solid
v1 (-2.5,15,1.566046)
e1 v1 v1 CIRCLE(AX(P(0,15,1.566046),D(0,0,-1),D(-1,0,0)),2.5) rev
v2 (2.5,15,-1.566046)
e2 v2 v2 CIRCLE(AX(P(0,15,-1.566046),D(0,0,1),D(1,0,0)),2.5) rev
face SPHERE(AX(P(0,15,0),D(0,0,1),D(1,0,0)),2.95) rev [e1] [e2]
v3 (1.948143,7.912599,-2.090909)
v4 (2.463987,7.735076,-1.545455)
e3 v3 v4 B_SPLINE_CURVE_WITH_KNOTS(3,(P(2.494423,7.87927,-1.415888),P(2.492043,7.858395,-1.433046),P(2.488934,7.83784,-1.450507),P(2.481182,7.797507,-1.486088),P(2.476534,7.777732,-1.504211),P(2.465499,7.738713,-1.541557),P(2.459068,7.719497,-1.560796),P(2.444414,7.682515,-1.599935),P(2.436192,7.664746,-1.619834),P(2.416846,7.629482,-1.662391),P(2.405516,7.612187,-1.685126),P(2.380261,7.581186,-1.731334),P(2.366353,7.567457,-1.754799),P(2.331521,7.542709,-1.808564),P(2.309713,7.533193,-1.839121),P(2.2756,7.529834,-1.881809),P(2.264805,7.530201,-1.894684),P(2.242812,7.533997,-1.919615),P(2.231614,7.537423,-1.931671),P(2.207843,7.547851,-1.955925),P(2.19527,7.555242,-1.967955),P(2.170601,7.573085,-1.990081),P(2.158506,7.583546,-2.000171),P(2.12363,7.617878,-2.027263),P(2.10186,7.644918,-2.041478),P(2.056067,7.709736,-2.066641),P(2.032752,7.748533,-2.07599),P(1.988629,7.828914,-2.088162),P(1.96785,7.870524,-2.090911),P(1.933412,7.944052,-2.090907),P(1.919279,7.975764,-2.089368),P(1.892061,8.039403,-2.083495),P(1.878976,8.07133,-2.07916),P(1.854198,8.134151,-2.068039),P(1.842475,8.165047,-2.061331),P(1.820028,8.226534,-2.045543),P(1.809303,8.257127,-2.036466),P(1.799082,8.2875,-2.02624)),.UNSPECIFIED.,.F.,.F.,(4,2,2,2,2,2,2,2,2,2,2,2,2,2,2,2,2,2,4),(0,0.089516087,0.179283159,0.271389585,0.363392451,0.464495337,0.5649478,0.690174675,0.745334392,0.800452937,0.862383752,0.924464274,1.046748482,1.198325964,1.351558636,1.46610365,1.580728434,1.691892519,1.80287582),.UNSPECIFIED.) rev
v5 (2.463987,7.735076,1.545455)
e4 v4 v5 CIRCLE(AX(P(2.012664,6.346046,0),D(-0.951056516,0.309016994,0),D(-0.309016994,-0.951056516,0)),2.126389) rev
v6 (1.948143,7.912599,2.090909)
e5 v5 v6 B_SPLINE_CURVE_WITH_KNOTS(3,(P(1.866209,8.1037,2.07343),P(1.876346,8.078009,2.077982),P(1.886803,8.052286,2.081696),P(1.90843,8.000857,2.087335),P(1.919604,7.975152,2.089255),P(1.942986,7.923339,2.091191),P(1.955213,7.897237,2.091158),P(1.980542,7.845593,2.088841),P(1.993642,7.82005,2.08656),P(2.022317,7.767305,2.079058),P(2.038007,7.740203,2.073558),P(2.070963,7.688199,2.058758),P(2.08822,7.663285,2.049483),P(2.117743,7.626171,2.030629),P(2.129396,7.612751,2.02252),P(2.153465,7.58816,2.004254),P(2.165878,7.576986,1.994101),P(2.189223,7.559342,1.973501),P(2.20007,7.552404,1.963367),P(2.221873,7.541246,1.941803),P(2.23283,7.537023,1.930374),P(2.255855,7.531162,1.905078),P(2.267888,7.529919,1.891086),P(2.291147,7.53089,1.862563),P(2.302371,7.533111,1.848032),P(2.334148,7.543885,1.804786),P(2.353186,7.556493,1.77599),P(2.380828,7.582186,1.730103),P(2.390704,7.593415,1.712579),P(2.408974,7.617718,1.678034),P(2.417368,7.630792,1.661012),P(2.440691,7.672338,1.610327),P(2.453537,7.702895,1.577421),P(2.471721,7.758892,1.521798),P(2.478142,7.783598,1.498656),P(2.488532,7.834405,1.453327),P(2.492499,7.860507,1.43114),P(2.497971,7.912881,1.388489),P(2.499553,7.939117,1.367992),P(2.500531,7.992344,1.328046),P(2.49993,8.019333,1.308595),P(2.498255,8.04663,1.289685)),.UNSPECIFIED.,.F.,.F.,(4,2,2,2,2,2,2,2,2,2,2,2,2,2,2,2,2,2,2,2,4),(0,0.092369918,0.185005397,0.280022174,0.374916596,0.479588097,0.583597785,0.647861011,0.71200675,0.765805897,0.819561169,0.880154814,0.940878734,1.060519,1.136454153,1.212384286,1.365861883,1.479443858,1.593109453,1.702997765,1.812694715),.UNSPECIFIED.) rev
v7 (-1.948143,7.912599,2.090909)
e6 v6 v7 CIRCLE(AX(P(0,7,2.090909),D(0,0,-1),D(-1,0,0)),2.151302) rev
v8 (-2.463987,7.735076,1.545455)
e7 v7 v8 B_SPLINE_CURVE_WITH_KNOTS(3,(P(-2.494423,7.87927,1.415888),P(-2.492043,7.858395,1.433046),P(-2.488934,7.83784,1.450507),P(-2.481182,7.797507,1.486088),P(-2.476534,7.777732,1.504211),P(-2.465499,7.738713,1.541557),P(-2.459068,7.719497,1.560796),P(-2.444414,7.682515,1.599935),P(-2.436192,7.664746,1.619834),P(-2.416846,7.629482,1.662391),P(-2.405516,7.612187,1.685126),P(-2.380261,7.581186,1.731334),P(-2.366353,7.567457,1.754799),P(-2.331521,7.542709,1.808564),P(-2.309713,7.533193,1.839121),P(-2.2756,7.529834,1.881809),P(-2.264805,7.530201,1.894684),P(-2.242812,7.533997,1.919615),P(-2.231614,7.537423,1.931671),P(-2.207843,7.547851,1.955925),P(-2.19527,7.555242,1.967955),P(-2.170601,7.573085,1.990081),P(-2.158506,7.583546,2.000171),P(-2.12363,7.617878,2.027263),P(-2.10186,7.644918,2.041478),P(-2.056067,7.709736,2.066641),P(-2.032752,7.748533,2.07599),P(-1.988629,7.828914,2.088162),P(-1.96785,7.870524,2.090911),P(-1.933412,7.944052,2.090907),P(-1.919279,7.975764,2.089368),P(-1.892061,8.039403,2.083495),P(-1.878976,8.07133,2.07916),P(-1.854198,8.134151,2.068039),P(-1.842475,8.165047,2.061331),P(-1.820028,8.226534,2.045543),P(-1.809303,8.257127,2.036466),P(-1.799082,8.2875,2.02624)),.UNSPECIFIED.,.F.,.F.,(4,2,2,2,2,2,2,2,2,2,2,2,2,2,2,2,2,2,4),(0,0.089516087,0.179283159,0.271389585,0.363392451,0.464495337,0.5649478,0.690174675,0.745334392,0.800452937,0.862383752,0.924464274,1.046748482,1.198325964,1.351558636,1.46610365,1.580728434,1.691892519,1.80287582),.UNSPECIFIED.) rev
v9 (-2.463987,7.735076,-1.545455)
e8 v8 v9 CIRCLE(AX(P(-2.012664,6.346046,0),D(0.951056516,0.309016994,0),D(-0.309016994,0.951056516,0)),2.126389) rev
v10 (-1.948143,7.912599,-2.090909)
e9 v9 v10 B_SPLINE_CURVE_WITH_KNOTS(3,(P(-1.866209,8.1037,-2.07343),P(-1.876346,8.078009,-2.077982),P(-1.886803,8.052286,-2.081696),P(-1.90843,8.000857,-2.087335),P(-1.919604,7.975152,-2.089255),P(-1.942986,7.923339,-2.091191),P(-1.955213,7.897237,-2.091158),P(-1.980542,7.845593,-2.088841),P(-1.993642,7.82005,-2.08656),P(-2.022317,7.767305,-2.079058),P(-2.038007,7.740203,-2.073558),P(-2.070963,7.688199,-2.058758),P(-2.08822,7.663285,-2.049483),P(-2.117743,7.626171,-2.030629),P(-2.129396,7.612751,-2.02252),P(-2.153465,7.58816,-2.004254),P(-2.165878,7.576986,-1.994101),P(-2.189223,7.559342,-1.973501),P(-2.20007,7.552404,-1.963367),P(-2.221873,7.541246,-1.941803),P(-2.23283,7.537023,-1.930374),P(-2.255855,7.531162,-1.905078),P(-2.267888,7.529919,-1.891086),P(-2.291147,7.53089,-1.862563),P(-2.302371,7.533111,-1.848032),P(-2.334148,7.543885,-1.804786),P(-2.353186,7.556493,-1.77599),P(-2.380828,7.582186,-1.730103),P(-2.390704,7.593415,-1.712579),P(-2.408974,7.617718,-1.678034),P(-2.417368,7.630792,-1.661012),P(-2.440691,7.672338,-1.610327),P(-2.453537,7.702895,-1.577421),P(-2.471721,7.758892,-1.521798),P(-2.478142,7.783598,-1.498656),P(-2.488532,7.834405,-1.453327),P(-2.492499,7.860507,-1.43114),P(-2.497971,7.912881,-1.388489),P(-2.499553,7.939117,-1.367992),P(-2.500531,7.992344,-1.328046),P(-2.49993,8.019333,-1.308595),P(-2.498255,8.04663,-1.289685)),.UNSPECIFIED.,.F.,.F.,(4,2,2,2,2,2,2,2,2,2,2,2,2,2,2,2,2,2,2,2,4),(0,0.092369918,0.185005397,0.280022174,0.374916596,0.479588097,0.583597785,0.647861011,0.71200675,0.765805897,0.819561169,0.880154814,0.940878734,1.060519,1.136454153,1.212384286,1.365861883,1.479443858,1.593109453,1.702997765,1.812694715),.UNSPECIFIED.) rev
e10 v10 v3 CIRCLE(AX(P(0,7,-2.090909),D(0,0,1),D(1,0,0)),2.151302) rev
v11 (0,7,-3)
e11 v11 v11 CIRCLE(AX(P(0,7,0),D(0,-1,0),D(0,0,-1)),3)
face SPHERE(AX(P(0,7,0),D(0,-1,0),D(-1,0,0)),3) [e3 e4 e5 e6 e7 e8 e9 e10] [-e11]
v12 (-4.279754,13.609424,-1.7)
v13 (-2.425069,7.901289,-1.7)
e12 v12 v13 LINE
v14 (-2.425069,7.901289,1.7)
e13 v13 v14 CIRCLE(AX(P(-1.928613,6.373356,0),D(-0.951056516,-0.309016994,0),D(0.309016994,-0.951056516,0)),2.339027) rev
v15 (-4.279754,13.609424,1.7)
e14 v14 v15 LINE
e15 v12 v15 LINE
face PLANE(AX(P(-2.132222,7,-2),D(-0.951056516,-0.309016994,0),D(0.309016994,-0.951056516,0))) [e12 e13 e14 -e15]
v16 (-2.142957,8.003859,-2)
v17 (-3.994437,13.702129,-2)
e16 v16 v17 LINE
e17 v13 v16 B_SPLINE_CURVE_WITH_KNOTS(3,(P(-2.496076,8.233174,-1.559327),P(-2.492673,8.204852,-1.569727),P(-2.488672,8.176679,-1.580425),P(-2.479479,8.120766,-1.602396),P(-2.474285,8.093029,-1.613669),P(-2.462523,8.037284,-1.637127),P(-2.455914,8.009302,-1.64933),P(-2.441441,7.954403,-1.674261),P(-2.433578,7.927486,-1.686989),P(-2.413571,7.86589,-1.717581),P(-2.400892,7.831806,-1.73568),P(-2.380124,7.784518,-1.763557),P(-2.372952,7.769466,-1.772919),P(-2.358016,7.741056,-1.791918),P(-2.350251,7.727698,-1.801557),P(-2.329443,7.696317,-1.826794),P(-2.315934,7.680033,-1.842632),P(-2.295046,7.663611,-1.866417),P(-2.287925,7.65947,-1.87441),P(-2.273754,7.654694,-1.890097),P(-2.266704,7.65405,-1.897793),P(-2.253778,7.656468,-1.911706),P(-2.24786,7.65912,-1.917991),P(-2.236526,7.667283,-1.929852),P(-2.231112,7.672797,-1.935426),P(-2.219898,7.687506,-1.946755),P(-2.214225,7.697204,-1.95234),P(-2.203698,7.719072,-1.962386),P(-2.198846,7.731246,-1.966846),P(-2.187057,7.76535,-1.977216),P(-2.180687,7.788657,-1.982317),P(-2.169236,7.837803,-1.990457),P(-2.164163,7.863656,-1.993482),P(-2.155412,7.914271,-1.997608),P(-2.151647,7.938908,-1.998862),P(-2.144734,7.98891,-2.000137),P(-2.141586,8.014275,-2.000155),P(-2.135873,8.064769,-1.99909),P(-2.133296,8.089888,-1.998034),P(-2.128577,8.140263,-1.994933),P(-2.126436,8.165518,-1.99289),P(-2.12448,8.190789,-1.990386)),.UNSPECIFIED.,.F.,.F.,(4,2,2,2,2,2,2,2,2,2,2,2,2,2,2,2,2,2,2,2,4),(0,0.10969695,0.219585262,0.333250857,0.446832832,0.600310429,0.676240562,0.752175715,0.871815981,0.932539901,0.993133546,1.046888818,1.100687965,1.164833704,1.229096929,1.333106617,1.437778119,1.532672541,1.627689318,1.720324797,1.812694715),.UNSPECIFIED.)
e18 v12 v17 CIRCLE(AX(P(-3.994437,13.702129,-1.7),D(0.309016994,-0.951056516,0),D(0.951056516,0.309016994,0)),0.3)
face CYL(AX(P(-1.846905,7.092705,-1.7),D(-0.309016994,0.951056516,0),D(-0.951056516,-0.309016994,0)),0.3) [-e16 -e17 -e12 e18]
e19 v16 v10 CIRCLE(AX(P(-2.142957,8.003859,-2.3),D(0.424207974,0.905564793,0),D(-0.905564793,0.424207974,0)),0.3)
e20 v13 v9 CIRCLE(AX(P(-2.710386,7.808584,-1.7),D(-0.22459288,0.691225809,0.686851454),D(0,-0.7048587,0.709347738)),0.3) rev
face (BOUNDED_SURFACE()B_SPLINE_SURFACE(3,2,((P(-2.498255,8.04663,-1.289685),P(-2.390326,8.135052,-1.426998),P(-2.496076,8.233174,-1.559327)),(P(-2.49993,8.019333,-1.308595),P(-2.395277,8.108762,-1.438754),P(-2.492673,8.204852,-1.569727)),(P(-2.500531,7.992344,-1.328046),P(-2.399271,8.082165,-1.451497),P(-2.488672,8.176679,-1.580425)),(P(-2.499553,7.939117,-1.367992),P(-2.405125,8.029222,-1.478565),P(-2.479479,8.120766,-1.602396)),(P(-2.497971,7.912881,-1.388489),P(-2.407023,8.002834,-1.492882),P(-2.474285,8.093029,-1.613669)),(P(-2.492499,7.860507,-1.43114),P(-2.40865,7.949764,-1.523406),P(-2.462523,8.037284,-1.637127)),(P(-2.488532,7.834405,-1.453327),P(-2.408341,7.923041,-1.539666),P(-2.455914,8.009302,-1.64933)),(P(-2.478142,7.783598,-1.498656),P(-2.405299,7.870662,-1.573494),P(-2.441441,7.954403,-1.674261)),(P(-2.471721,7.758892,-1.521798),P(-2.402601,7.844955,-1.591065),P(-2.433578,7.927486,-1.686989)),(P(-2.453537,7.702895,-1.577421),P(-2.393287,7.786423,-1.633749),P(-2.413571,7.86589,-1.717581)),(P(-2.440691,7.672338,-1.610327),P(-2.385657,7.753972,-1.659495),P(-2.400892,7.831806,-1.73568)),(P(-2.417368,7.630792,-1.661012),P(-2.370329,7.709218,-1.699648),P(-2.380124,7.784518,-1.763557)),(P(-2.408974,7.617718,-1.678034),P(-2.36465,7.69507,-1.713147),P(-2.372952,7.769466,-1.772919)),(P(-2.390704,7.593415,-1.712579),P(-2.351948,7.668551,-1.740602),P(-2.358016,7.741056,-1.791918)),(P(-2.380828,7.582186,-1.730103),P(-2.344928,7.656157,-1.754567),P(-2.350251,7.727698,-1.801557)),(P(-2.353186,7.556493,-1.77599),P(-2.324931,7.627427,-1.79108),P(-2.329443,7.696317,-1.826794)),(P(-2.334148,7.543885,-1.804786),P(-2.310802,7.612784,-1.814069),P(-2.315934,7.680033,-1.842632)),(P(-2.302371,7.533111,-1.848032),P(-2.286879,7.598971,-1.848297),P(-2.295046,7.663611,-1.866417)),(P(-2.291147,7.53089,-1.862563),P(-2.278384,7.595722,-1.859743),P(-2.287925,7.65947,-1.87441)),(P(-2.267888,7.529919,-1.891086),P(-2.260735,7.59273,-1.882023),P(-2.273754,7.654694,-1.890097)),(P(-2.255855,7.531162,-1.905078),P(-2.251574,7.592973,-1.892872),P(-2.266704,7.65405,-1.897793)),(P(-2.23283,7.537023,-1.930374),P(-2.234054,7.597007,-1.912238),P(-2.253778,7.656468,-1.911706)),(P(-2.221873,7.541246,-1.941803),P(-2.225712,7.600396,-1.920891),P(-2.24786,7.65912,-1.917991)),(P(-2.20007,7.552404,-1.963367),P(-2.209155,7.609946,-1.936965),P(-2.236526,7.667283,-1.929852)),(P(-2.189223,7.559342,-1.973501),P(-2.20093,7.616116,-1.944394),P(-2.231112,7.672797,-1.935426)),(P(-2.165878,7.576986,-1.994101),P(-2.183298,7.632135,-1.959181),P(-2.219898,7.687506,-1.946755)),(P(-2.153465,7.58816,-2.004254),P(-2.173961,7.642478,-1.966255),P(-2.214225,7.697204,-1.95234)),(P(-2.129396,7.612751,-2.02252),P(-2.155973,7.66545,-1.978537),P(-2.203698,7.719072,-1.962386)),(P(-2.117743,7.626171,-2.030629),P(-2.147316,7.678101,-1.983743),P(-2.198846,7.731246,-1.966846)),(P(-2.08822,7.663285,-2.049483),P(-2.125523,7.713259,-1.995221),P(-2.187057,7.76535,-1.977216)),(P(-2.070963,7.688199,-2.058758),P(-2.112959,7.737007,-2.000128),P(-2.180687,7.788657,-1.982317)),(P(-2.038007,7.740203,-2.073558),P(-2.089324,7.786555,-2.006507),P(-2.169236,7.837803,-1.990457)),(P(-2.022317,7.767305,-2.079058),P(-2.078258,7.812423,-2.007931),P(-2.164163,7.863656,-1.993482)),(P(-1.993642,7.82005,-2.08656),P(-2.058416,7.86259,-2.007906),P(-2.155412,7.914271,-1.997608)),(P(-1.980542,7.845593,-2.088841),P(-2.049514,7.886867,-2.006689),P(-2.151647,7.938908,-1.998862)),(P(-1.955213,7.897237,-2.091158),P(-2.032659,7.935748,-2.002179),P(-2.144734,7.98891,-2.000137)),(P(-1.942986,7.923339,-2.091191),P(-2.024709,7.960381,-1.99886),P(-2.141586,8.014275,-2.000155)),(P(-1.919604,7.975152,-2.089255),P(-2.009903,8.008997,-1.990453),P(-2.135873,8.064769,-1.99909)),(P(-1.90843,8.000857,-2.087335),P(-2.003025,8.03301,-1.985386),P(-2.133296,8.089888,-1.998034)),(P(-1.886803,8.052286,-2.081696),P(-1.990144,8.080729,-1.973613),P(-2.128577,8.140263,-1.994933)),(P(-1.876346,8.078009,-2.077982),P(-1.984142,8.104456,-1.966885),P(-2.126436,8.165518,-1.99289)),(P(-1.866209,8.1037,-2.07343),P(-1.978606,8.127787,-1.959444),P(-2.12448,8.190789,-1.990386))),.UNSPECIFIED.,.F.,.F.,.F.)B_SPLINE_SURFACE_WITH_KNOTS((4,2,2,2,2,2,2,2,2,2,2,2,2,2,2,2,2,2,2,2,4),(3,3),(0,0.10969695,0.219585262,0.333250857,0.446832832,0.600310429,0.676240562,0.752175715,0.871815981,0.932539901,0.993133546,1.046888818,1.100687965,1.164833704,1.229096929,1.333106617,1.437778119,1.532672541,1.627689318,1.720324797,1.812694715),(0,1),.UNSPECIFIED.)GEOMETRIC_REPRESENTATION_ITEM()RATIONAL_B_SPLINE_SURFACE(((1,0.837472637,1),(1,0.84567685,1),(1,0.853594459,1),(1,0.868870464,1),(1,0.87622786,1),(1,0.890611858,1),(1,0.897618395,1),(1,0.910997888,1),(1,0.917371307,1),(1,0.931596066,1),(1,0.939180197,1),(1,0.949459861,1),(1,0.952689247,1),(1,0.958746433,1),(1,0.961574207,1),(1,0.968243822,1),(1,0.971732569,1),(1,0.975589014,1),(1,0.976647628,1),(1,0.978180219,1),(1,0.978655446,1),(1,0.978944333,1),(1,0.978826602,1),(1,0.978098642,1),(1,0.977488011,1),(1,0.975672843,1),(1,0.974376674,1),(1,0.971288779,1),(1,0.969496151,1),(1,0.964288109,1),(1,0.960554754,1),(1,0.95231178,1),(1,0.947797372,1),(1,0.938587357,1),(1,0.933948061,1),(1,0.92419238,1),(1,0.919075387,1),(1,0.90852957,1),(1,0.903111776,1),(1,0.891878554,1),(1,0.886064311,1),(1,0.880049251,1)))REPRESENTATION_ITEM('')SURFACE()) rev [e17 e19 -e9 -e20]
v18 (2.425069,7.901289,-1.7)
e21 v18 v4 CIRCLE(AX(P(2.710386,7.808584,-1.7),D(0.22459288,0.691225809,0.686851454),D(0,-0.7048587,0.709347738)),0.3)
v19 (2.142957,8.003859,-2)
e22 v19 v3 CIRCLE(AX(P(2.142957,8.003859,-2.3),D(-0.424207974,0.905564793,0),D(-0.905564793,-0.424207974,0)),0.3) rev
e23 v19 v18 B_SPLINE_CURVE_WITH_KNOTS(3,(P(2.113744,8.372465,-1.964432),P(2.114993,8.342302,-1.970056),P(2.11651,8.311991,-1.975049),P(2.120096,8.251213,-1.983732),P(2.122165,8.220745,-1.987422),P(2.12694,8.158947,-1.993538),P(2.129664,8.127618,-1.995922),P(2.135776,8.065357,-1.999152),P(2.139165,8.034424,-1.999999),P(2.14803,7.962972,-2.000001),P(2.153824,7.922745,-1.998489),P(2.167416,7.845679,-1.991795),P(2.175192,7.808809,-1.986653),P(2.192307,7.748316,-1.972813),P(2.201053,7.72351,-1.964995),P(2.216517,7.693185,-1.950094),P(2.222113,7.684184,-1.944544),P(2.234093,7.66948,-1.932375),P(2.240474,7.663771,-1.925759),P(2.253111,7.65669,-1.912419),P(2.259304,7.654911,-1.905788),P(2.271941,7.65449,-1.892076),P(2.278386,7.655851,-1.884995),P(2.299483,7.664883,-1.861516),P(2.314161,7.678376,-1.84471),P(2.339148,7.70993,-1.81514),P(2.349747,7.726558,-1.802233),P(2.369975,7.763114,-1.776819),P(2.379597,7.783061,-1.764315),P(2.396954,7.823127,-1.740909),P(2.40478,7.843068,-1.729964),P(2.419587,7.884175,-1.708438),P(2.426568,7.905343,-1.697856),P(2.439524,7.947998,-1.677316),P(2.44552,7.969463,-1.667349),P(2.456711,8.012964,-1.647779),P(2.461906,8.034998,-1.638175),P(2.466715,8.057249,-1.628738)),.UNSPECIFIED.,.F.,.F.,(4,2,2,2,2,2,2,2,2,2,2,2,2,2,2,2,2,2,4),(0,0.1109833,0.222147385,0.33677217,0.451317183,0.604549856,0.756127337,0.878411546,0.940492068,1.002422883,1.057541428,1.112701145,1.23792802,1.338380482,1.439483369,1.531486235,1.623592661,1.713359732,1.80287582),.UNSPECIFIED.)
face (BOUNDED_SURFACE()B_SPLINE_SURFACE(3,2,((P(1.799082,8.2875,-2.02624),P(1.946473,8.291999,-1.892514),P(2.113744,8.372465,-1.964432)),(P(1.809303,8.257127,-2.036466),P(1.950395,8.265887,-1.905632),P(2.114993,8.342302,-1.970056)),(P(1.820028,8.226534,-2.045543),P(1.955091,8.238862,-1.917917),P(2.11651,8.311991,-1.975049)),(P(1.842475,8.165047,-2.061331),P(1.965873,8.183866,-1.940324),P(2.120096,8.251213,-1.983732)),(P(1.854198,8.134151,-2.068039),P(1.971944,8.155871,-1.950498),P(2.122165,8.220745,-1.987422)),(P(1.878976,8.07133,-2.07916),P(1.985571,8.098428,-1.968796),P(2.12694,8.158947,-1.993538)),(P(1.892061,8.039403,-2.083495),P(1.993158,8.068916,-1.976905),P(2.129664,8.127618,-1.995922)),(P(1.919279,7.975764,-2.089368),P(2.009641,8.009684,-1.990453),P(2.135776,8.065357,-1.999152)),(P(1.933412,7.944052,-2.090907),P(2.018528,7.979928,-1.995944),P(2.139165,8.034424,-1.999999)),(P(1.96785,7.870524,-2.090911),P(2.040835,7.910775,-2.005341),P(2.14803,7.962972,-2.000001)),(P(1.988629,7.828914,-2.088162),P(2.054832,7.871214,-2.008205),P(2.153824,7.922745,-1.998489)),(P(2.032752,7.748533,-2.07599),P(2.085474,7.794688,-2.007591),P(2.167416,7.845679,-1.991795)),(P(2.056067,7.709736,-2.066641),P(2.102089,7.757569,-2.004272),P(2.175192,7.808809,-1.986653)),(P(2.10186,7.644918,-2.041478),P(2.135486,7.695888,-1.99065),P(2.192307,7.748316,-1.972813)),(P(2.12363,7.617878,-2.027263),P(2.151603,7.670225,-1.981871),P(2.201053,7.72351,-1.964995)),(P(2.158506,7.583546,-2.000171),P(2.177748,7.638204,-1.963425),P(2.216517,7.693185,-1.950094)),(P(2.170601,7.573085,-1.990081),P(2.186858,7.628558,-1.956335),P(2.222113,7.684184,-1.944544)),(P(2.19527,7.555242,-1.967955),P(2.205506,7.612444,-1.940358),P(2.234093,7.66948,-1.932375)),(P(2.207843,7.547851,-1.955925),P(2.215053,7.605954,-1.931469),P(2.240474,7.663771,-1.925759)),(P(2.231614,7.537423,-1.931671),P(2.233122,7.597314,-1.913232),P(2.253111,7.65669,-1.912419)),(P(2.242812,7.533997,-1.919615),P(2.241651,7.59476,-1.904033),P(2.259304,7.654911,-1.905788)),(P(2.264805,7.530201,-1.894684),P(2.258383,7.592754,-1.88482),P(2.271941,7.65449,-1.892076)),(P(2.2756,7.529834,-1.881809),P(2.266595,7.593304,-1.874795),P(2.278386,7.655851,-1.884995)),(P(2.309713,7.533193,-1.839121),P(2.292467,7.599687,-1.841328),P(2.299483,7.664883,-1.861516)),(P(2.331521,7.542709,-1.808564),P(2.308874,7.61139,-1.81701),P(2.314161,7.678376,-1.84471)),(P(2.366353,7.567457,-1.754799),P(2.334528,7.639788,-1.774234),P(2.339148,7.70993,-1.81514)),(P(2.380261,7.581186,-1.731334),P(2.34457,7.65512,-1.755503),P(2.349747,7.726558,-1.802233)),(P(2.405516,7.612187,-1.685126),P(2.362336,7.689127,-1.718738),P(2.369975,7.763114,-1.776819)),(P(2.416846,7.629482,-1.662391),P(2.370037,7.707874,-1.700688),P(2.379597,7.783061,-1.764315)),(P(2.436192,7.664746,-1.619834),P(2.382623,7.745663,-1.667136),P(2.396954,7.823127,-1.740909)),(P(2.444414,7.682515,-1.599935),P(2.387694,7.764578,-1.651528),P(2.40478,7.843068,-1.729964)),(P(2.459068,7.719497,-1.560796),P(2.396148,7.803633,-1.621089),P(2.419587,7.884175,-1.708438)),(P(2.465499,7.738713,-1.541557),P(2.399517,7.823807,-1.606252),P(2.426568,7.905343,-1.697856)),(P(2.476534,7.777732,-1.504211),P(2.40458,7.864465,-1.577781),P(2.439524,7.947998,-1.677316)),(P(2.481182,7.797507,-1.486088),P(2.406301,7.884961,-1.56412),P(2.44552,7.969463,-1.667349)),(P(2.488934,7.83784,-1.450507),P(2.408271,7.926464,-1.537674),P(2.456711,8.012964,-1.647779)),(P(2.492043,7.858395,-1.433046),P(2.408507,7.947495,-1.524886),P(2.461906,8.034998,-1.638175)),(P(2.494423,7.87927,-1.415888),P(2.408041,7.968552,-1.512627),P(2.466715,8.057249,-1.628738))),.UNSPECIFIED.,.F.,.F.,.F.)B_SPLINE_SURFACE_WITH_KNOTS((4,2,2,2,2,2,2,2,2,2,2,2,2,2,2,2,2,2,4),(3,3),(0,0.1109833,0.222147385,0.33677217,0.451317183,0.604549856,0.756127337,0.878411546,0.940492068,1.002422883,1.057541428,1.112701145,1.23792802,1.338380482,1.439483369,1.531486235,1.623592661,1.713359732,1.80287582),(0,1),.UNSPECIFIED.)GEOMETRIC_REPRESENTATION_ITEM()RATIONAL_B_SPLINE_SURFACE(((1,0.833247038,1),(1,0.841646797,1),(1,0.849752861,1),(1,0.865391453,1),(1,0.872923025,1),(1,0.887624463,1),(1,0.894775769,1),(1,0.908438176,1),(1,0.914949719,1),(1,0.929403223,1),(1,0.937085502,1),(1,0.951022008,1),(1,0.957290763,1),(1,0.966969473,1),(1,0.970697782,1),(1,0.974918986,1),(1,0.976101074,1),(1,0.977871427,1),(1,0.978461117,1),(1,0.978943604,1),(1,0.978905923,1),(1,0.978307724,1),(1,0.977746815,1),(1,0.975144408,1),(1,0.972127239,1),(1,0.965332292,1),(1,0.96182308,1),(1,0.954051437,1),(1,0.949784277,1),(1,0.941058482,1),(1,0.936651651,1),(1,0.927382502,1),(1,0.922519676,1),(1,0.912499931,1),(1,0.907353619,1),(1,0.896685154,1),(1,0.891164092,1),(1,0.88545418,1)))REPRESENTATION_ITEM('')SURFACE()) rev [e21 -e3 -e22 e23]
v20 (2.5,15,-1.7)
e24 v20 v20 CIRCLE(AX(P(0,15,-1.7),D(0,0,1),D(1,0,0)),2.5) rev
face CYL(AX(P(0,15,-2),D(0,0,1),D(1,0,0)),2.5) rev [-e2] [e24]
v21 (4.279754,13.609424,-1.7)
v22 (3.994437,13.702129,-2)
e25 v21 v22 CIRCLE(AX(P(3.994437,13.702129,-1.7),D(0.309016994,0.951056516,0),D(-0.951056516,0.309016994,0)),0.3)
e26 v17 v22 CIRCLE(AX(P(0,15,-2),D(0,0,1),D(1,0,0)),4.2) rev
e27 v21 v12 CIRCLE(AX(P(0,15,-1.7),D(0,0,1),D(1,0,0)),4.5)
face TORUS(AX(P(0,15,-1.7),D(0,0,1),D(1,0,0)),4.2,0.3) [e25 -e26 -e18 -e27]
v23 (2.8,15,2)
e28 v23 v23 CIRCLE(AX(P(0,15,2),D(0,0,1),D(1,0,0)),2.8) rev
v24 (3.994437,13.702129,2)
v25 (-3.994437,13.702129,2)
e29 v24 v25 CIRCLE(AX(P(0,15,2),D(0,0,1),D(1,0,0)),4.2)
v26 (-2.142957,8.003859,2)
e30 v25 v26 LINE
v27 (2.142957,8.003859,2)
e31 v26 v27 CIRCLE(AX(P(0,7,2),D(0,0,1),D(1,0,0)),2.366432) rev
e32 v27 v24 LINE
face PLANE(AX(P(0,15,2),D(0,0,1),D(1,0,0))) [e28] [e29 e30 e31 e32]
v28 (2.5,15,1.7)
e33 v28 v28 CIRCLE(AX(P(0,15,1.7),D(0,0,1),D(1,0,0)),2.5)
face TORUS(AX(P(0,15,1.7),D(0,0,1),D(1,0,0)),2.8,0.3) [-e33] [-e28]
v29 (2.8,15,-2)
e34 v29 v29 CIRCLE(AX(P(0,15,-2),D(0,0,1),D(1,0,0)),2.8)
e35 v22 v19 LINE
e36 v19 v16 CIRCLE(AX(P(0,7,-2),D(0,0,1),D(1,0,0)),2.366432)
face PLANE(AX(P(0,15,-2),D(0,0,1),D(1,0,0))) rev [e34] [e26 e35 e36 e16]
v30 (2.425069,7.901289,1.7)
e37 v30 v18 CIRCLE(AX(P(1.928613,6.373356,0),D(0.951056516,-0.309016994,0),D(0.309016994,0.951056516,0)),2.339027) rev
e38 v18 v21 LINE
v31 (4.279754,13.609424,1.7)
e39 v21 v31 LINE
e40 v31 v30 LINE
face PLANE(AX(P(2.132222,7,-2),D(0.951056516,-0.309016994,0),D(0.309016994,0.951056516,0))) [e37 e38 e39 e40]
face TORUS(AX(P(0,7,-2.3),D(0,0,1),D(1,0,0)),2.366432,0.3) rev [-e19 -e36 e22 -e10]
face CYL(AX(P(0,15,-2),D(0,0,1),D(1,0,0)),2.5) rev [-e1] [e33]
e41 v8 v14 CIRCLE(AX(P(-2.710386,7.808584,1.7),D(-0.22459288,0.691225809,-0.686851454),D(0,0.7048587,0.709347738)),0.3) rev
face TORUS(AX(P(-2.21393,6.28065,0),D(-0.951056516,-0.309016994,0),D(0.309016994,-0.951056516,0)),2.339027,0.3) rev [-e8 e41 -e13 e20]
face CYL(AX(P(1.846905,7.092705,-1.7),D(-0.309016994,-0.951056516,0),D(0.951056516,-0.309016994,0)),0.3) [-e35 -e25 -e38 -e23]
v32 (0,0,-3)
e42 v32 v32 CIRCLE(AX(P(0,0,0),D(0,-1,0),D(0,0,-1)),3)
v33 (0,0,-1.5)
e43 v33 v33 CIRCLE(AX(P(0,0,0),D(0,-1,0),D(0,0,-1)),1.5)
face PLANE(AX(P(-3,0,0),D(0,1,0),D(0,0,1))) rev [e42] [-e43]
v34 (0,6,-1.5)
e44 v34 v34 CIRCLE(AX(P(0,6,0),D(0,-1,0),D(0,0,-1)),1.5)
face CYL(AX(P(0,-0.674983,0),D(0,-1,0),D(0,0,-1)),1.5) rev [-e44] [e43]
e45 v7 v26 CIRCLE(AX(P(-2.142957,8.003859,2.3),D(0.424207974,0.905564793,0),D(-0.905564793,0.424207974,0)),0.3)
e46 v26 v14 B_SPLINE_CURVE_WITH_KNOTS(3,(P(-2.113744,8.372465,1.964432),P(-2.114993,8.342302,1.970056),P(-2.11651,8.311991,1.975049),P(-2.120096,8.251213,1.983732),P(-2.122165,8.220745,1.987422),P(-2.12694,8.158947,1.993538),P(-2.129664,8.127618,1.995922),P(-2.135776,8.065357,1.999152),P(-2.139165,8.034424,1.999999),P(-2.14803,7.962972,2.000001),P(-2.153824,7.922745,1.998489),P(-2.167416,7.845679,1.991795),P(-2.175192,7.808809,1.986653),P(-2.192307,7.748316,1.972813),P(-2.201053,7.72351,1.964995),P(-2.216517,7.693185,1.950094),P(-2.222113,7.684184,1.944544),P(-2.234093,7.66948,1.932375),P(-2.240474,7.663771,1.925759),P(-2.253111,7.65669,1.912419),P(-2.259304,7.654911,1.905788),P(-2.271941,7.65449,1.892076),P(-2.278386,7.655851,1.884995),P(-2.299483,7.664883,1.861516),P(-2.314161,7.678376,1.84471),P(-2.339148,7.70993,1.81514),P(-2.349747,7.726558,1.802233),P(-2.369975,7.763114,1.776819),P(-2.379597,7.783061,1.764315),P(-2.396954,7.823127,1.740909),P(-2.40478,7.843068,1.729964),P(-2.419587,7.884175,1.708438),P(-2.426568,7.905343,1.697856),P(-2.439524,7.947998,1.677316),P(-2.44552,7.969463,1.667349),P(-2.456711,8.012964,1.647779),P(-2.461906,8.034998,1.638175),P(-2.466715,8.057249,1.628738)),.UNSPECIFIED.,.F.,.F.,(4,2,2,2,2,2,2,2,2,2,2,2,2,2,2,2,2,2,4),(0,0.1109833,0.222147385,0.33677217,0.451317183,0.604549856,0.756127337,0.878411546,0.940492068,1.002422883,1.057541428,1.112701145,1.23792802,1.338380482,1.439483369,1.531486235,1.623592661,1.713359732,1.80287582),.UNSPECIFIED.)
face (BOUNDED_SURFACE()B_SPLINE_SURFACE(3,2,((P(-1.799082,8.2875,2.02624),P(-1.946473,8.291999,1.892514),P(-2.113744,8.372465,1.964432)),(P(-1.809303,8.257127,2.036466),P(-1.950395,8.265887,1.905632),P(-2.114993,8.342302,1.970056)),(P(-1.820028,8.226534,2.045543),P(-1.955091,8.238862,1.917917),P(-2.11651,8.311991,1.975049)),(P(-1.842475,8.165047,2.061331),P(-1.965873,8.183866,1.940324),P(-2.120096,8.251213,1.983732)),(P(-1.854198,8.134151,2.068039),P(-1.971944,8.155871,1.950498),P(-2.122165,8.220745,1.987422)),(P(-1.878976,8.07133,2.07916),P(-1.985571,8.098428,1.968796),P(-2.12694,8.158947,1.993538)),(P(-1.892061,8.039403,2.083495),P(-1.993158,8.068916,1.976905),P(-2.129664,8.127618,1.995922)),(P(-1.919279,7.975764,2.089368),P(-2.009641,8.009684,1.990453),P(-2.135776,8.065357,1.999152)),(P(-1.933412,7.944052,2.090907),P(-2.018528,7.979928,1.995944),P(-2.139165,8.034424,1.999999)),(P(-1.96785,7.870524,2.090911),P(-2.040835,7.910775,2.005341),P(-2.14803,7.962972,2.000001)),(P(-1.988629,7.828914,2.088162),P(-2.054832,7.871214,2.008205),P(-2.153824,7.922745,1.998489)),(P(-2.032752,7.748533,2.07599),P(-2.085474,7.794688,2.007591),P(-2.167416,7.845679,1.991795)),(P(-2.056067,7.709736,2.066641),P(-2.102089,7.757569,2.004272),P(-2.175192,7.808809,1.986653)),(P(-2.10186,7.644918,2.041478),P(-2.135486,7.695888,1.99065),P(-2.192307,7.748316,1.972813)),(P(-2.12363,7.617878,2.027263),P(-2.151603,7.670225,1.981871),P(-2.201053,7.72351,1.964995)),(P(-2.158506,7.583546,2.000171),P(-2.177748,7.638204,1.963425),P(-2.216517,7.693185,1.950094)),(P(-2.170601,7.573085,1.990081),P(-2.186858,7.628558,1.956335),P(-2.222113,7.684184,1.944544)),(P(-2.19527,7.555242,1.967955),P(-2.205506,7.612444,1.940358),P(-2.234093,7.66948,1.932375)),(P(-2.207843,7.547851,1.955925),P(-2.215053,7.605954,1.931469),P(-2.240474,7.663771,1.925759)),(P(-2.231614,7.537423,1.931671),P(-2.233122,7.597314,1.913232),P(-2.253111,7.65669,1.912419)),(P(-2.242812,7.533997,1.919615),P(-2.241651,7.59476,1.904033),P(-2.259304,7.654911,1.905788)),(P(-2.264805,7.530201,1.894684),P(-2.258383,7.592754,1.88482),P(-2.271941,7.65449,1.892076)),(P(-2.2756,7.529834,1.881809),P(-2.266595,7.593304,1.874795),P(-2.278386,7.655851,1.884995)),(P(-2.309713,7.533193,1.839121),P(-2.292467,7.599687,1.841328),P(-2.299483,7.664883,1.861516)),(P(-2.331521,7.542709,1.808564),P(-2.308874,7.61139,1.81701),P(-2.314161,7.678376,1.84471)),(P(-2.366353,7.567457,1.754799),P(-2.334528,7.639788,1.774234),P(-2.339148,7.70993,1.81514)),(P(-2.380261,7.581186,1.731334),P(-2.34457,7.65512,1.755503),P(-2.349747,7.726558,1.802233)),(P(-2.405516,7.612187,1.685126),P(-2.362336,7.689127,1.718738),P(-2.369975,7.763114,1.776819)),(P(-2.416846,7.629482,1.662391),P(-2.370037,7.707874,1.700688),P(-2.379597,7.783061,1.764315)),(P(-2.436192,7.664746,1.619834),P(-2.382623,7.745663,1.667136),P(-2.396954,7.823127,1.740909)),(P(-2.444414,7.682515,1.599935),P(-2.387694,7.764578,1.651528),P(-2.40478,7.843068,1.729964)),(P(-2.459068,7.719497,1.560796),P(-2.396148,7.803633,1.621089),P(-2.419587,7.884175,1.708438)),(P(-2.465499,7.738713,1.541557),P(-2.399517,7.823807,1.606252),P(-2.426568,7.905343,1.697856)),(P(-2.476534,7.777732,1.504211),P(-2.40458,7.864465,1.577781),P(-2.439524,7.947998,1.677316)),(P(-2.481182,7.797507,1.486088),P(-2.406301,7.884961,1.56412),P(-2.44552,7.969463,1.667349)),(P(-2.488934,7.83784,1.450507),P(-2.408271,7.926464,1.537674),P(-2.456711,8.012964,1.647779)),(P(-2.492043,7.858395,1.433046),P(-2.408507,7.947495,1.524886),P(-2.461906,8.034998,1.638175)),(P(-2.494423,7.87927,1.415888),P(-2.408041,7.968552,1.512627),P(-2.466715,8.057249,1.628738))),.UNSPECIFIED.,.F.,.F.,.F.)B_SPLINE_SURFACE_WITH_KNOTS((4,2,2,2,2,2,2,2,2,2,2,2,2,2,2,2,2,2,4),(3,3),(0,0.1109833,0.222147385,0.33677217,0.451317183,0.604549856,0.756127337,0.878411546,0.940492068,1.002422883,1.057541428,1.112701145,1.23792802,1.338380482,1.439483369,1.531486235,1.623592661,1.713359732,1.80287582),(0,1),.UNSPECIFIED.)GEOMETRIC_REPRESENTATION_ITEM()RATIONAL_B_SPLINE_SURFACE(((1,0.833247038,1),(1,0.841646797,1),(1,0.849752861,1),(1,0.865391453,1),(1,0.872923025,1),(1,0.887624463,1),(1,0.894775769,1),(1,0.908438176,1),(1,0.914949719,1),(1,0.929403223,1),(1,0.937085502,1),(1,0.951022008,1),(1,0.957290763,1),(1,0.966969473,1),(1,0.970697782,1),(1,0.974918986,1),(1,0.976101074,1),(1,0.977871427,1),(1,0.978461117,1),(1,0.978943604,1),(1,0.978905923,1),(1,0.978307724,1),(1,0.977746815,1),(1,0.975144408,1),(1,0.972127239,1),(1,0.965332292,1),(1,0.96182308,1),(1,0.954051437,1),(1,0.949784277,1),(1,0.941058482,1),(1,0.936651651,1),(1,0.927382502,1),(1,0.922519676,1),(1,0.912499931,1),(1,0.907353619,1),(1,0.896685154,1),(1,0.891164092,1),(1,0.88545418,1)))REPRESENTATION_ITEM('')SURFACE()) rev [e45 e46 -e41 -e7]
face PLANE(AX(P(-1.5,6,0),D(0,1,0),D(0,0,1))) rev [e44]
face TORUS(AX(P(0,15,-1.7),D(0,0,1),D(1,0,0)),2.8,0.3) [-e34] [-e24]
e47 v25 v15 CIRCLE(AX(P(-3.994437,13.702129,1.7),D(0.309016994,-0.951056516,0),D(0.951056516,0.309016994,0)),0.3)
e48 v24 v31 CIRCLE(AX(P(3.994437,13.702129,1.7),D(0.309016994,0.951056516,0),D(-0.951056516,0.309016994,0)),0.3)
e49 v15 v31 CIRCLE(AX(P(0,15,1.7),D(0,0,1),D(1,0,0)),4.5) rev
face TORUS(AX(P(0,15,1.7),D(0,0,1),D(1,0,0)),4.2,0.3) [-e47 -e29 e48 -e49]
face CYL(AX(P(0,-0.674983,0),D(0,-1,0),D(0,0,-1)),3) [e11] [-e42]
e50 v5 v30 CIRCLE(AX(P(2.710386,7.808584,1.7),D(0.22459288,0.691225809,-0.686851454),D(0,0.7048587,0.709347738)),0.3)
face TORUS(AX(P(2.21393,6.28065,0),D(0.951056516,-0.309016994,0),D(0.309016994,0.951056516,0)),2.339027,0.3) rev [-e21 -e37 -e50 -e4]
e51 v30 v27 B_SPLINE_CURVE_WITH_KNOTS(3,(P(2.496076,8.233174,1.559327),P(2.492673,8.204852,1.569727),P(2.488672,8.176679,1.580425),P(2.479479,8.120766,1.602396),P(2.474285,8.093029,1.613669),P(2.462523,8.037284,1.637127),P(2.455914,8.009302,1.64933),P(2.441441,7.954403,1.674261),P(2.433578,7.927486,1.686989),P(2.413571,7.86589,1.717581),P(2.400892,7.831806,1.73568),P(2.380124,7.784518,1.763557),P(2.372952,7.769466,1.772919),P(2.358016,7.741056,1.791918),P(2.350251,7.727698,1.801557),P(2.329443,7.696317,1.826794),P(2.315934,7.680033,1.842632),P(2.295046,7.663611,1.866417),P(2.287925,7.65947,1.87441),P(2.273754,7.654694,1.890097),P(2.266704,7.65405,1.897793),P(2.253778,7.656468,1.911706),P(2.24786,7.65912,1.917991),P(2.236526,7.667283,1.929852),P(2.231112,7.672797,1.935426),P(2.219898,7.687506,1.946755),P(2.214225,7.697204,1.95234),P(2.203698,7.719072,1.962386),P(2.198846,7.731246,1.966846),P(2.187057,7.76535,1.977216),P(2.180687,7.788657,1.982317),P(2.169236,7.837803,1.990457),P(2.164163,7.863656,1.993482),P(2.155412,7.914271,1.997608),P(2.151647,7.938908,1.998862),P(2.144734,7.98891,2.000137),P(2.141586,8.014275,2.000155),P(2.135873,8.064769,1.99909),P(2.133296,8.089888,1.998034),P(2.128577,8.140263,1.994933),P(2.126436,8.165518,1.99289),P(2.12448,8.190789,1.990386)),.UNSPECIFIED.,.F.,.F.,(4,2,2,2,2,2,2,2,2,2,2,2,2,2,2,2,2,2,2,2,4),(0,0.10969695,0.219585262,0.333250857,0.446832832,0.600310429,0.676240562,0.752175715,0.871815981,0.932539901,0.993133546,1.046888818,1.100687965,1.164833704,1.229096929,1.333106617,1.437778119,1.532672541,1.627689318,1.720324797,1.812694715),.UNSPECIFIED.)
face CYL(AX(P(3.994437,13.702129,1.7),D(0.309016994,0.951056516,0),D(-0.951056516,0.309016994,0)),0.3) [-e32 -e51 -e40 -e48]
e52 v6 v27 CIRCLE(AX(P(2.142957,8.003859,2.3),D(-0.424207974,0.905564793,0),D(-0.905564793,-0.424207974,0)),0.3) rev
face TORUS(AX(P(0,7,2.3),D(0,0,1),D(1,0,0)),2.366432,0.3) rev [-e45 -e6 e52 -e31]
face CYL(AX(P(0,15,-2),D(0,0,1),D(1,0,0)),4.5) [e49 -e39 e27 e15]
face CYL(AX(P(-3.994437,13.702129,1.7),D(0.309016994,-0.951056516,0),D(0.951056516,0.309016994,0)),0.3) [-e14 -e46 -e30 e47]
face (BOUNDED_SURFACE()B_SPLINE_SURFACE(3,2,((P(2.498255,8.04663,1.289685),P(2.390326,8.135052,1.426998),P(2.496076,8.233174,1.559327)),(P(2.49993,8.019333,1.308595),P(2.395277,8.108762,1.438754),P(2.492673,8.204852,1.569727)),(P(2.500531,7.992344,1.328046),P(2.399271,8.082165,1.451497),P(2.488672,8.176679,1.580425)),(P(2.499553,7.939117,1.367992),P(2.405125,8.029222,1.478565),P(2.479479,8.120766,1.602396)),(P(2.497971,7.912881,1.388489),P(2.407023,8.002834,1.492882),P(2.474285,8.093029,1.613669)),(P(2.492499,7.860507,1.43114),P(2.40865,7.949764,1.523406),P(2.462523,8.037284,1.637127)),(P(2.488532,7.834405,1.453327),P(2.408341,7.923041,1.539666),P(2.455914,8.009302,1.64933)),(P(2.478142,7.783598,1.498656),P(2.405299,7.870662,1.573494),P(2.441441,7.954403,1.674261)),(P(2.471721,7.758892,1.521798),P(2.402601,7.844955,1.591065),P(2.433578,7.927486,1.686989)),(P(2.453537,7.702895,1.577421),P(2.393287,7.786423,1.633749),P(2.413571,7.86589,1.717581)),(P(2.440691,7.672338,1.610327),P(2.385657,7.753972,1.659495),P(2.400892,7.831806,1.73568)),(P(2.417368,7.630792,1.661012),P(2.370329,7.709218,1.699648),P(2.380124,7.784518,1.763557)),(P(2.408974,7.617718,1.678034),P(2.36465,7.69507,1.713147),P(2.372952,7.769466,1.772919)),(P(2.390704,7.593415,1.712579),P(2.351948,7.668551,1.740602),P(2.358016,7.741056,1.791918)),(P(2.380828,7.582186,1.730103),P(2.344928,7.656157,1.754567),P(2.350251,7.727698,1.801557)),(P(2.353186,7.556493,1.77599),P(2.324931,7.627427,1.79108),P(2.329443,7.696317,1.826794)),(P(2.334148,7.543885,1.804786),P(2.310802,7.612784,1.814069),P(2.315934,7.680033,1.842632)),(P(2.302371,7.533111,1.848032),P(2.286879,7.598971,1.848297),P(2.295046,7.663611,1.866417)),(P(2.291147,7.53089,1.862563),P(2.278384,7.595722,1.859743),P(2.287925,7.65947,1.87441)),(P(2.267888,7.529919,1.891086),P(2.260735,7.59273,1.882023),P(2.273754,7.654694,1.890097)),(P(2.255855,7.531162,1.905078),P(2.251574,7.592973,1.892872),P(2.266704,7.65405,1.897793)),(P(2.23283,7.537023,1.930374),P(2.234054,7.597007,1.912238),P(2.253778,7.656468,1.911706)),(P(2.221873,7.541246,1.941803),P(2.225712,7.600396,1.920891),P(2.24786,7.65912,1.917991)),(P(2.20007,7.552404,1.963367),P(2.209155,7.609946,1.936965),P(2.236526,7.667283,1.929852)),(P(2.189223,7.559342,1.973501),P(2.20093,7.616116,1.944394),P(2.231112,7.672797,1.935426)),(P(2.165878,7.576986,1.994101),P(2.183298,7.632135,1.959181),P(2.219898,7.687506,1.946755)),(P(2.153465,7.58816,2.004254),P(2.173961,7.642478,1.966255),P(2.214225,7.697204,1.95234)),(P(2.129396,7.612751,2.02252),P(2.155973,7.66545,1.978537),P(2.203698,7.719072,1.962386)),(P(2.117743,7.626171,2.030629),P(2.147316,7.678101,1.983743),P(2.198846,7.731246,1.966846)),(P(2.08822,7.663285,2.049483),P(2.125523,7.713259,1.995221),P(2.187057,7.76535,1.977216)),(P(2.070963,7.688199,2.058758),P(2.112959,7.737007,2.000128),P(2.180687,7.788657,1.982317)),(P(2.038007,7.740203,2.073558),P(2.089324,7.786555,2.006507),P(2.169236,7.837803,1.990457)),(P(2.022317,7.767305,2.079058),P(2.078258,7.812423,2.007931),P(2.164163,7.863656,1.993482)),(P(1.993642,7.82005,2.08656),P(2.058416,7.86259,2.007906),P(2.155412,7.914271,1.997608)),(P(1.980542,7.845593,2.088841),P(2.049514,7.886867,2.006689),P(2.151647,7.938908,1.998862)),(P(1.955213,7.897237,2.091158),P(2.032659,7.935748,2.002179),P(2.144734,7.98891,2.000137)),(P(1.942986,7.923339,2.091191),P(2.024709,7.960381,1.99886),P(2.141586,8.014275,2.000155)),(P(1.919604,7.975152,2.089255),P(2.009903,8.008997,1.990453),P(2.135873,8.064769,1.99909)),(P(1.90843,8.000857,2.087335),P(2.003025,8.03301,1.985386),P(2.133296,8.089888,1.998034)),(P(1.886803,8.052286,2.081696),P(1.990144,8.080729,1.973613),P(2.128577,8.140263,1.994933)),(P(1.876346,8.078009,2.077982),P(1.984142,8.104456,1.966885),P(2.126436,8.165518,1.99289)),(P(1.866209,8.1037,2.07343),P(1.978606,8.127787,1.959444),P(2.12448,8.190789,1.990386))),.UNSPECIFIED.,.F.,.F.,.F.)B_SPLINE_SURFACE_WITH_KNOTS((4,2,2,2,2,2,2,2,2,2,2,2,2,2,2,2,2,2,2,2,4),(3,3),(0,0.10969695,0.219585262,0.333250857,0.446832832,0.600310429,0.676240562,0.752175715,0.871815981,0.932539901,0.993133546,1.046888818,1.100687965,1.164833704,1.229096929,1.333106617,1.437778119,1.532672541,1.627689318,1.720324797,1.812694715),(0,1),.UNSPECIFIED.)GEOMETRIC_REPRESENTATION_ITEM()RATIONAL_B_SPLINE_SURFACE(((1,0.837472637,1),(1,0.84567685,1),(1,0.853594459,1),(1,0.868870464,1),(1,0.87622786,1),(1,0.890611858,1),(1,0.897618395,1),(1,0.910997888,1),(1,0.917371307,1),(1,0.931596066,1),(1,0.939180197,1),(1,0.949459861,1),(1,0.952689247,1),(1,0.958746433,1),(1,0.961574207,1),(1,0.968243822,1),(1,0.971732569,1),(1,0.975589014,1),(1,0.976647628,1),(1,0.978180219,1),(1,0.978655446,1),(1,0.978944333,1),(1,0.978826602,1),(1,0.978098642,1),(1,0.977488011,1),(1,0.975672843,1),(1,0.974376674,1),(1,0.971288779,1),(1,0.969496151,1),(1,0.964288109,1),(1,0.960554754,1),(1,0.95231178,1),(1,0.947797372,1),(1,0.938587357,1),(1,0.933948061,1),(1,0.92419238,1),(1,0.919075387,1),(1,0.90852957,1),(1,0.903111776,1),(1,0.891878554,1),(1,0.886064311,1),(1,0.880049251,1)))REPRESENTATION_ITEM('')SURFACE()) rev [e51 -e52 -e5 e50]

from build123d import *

# Parameters (mm, degrees)
BOSS_EXTRU_1_DEPTH      = 2
BOSS_EXTRU_1_DEPTH_BACK = 2
ESQUISSE2_R             = 2.5
CONG_1_R                = 0.3


with BuildPart() as part:
    # Esquisse1 → Révolution1 (revolve)
    with BuildSketch(Plane.XY):
        with BuildLine():
            Line((0, 6), (0, 10))
            ThreePointArc((0, 10), (-2.121320344, 9.121320344), (-3, 7))
            Line((-3, 7), (-3, 0))
            Line((-3, 0), (-1.5, 0))
            Line((-1.5, 0), (-1.5, 6))
            Line((-1.5, 6), (0, 6))
        make_face()
    revolve(axis=Axis((0, -0.674983233, 0), (0, 1, 0)))

    # Esquisse2 → Boss.-Extru.1 (add, two sides: drawn at the far end of the back side and taken through both)
    with BuildSketch(Plane.XY.offset(-BOSS_EXTRU_1_DEPTH_BACK)):
        with BuildLine():
            Line((-2.132222439, 7), (-4.279754323, 13.609423525))
            ThreePointArc((-4.279754323, 13.609423525), (0, 19.5), (4.279754323, 13.609423525))
            Line((4.279754323, 13.609423525), (2.132222439, 7))
            Line((2.132222439, 7), (-2.132222439, 7))
        make_face()
        with Locations((0, 15)):
            Circle(ESQUISSE2_R, mode=Mode.SUBTRACT)
    extrude(amount=BOSS_EXTRU_1_DEPTH + BOSS_EXTRU_1_DEPTH_BACK)

    # Esquisse3 → Enlèvement de matière-Révolution1 (revolve, cut)
    with BuildSketch(Plane.XY):
        with BuildLine():
            Line((0, 17.95), (0, 12.05))
            ThreePointArc((0, 12.05), (-2.95, 15), (0, 17.95))
        make_face()
    revolve(axis=Axis((0, 11.065209796, 0), (0, 1, 0)), mode=Mode.SUBTRACT)

    # Congé1
    cong_1_edges = [part.edges().sort_by_distance(p)[0] for p in [
        (0, 19.5, -2),
        (-3.249763904, 10.439438968, -2),
        (3.249763904, 10.439438968, -2),
        (-2.5, 15, -2),
        (-2.5, 15, 2),
        (-3.249763904, 10.439438968, 2),
        (0, 19.5, 2),
        (3.249763904, 10.439438968, 2),
    ]]
    fillet(cong_1_edges, radius=CONG_1_R)
    cong_1_2_edges = [part.edges().sort_by_distance(p)[0] for p in [
        (-2.547134089, 8.276966755, -0.938863057),
        (2.611797225, 8.475979423, 3.5e-08),
        (2.4e-08, 9.236067977, -2),
        (2.4e-08, 9.236067977, 2),
        (-2.547134089, 8.276966755, 0.938863057),
        (-2.233315922, 7.596093395, 1.912321273),
        (2.233315922, 7.596093395, 1.912321273),
        (-2.233299855, 7.596099057, -1.912338273),
        (2.233299855, 7.596099057, -1.912338273),
    ]]
    fillet(cong_1_2_edges, radius=CONG_1_R)


solid = part.part
